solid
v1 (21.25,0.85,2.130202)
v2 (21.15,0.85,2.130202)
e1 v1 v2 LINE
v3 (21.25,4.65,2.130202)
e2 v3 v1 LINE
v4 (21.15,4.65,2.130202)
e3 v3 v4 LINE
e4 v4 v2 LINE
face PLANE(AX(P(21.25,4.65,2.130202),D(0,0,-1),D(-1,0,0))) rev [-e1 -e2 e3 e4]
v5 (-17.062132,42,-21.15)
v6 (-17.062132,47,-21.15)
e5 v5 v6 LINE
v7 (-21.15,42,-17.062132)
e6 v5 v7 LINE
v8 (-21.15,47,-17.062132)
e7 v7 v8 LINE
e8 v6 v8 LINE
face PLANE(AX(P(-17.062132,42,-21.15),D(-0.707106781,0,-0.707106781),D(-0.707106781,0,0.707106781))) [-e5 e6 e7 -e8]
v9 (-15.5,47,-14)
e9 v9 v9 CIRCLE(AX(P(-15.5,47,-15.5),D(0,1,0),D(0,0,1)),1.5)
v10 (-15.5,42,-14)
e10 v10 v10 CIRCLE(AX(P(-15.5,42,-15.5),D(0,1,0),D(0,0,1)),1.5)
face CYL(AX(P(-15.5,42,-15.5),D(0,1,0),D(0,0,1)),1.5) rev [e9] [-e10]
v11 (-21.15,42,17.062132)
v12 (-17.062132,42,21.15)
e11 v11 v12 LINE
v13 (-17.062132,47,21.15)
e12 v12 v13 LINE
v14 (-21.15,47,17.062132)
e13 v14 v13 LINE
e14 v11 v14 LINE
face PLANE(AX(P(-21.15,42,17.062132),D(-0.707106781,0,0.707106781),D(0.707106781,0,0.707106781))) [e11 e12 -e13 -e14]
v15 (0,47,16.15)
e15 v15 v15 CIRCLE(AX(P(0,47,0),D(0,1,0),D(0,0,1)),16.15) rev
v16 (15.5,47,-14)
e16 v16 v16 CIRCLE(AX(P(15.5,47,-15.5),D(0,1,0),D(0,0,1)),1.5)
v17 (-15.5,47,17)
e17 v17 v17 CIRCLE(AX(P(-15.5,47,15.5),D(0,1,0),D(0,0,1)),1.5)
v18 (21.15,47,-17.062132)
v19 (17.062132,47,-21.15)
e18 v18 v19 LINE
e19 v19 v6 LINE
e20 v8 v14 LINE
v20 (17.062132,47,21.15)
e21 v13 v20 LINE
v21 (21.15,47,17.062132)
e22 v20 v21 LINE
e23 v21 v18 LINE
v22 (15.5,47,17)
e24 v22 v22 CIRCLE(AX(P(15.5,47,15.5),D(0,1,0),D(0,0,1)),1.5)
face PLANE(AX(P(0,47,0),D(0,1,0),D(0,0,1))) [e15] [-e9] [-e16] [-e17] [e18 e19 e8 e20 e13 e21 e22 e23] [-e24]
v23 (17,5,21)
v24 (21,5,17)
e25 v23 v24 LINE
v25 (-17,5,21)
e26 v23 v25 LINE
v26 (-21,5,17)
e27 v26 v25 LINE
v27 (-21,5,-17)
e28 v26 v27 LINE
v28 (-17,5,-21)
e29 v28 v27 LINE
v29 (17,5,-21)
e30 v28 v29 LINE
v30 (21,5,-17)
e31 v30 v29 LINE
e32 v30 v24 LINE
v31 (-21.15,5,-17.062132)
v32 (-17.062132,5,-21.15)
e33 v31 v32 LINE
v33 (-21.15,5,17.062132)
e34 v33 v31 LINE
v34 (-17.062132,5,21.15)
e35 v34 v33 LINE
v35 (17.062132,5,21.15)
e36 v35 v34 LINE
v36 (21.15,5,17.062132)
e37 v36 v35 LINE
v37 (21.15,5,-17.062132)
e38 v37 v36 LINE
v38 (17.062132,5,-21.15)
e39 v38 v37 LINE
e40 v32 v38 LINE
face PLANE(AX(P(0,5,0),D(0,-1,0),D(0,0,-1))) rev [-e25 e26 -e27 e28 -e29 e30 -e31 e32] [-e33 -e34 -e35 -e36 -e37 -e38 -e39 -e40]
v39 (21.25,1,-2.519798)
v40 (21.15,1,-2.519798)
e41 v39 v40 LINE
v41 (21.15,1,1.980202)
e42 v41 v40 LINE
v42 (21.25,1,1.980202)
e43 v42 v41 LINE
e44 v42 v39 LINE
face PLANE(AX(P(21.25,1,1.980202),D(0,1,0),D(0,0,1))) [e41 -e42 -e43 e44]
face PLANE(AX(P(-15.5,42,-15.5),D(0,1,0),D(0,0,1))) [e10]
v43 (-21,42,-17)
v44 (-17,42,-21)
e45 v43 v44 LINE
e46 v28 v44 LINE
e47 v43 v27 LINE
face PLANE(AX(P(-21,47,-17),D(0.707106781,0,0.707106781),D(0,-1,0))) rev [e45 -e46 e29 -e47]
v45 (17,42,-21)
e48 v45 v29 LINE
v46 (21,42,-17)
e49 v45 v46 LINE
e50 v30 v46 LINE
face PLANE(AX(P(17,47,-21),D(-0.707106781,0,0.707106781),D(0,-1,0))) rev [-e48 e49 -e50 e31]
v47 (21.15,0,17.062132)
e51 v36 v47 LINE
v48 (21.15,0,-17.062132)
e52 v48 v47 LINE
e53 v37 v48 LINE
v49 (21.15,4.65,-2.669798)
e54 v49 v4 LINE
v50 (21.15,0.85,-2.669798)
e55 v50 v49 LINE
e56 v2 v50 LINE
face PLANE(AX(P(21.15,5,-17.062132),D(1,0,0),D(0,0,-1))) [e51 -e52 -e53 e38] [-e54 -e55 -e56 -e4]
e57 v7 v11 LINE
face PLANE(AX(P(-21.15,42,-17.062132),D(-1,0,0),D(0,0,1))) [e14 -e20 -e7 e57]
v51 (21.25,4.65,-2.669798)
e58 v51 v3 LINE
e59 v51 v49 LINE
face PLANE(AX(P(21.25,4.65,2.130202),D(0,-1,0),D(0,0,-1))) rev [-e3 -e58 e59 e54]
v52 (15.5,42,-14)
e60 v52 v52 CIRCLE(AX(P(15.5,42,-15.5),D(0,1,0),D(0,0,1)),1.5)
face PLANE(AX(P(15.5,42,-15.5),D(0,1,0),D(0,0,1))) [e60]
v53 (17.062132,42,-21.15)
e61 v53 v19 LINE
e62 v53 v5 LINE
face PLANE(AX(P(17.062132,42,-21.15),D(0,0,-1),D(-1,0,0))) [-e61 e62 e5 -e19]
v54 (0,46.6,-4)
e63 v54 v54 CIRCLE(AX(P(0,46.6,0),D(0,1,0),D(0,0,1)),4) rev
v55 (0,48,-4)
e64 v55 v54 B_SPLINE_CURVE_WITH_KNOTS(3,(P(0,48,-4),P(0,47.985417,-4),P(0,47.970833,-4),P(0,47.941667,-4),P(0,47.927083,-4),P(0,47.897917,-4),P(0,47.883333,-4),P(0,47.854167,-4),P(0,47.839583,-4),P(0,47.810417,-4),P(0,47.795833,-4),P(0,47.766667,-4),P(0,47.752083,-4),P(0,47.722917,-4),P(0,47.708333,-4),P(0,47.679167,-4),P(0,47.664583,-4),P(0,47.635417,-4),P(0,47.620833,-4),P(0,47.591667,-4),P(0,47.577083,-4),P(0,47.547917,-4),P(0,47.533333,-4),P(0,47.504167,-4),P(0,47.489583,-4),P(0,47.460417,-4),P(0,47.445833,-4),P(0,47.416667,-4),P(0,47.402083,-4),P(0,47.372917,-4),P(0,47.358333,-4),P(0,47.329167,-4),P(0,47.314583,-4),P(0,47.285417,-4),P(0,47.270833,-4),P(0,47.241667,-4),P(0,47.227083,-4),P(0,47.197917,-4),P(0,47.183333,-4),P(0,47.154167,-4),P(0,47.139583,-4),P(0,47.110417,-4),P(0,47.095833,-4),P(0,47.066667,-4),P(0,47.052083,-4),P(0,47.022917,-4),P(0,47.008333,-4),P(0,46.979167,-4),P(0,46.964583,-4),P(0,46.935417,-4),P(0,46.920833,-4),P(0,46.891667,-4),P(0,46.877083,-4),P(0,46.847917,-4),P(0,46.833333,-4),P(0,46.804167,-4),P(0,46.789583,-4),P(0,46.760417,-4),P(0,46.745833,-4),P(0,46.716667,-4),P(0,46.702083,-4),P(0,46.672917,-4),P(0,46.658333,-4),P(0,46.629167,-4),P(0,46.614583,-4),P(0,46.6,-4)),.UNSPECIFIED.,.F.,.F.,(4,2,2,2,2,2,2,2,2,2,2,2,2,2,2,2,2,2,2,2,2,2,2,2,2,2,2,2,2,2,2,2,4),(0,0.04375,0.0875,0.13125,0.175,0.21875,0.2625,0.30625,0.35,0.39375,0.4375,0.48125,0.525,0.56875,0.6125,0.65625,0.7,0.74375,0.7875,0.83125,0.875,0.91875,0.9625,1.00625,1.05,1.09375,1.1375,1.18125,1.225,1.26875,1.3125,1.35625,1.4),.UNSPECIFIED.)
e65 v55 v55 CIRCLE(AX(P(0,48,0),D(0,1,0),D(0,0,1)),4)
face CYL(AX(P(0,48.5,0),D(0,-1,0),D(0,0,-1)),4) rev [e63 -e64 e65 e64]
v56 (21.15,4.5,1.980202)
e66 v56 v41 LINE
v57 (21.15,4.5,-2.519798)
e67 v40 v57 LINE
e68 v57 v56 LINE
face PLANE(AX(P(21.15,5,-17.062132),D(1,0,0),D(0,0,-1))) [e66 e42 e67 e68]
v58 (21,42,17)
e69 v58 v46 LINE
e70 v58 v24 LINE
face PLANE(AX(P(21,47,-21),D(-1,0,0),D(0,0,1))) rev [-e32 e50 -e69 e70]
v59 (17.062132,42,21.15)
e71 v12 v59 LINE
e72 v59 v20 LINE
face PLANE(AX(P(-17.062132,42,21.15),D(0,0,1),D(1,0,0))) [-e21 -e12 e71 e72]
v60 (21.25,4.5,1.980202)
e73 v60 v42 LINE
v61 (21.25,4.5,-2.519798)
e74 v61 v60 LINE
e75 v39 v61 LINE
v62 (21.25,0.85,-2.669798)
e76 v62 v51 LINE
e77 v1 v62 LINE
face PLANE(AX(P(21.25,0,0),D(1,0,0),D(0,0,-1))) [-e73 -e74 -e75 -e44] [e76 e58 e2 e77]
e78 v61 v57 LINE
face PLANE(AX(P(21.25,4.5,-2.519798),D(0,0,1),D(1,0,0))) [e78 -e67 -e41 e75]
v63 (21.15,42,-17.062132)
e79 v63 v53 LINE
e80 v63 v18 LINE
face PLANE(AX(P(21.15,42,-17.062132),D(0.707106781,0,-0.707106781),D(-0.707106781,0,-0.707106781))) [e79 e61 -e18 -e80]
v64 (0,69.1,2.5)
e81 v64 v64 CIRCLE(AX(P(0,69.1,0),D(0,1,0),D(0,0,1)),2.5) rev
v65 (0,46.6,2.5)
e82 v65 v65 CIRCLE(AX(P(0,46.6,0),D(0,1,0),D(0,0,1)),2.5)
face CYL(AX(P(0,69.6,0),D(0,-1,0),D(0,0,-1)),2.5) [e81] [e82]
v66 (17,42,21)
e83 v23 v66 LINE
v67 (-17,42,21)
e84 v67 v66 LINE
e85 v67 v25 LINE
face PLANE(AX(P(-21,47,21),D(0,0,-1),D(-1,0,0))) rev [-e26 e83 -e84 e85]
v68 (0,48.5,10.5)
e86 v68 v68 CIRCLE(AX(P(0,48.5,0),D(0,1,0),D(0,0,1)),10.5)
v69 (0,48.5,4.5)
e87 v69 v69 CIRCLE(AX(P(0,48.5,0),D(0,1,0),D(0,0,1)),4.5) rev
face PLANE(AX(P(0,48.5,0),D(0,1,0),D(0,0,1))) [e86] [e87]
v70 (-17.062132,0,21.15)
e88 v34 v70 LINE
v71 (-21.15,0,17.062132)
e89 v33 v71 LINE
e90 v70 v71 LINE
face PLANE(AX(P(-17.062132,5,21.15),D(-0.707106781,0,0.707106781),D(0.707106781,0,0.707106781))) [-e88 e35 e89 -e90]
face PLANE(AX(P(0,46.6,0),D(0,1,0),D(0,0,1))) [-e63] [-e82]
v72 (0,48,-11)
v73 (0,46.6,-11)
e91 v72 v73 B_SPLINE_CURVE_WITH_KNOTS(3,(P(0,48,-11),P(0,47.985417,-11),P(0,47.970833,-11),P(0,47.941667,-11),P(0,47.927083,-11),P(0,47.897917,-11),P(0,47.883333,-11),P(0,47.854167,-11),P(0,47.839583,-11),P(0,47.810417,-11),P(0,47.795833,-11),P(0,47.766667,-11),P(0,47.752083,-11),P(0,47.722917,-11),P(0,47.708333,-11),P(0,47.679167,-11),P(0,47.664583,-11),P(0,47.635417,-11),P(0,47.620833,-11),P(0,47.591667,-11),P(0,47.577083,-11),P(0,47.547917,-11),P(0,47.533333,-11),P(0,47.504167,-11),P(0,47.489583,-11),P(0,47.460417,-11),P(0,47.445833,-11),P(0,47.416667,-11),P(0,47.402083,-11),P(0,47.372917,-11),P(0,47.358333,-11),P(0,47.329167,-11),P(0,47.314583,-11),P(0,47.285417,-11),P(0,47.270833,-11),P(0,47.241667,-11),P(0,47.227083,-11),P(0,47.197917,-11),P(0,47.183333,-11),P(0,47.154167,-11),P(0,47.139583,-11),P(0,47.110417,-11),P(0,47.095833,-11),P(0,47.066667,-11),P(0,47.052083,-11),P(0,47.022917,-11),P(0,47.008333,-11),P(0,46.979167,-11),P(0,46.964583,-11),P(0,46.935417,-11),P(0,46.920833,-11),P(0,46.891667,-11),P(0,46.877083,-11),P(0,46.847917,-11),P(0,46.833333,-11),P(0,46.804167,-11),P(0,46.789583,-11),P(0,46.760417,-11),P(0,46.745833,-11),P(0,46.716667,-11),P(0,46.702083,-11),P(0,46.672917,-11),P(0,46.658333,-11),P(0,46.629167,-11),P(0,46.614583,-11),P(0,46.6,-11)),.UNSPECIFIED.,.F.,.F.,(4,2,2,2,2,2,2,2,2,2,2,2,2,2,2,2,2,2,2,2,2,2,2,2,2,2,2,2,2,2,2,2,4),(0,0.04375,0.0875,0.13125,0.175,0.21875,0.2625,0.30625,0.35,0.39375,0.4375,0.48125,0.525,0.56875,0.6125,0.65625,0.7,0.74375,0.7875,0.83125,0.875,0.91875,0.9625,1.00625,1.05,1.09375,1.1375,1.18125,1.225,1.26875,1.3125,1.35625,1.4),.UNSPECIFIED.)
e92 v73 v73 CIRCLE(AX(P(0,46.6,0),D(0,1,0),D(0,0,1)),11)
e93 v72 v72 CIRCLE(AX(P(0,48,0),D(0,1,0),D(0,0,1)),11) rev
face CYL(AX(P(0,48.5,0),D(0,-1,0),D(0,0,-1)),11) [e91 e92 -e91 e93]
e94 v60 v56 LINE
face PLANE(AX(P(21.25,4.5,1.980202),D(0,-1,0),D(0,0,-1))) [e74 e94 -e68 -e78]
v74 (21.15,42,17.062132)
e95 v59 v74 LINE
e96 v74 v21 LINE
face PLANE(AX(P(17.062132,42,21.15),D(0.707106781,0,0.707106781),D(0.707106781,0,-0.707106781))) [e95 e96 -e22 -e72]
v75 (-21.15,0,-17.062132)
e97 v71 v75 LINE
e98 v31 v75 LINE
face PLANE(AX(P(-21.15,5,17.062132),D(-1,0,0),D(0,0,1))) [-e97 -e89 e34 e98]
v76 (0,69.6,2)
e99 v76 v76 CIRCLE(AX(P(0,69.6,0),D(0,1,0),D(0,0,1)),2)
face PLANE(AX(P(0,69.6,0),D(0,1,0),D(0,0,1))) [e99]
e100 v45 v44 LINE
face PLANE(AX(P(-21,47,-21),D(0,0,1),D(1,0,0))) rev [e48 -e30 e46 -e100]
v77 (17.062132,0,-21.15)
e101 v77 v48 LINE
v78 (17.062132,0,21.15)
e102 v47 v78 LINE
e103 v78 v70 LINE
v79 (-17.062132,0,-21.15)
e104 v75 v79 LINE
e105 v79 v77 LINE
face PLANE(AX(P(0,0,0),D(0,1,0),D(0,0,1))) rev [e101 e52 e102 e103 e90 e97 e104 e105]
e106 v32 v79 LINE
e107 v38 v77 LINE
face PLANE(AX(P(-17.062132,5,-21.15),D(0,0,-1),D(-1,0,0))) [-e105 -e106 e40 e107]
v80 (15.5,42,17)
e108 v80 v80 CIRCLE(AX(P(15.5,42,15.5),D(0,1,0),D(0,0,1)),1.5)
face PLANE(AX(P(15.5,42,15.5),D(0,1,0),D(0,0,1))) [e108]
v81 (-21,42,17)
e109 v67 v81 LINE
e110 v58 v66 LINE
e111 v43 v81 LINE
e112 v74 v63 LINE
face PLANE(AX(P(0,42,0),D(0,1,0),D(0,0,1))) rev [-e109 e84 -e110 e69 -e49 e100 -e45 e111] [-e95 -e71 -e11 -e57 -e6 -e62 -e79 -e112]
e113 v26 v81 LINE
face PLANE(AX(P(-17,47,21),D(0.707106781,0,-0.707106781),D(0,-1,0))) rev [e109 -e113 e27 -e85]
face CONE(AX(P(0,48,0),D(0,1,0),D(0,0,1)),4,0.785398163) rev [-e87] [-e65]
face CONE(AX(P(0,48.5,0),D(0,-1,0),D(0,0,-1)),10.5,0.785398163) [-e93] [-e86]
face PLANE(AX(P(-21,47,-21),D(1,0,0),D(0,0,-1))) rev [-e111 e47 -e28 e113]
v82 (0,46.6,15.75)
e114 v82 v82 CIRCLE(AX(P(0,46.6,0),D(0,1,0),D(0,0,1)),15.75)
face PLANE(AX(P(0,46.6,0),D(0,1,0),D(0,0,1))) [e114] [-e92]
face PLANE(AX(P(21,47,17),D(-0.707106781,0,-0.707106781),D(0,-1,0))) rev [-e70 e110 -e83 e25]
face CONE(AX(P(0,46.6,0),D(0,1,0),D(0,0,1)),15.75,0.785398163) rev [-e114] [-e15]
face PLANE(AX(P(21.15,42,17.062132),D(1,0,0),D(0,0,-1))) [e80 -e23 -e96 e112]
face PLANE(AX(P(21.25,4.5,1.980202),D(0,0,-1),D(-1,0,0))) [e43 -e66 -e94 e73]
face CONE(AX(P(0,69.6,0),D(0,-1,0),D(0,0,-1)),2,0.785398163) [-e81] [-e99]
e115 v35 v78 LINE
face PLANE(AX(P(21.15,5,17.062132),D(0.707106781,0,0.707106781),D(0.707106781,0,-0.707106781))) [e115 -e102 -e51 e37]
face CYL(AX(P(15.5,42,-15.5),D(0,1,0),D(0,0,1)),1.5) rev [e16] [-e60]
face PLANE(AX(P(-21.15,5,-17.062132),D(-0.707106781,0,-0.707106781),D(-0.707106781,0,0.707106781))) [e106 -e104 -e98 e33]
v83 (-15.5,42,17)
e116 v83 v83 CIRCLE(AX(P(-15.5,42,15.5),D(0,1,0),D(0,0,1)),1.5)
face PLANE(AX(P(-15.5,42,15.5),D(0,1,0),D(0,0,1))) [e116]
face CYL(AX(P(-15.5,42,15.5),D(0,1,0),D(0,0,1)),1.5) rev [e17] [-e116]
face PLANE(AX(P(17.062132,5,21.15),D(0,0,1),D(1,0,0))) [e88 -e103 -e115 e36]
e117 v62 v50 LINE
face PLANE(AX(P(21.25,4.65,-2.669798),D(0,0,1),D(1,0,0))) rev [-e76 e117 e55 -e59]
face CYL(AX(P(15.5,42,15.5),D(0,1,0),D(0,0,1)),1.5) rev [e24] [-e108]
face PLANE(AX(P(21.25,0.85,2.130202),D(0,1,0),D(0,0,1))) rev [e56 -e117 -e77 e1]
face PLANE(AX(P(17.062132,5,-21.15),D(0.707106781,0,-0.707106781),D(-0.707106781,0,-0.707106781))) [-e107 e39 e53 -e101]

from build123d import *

# Parameters (mm, degrees)
SKETCH1_W           = 42
SKETCH1_H           = 42
BOSS_EXTRUDE1_DEPTH = 47
CHAMFER1_SIZE       = 4
BOSS_EXTRUDE4_DEPTH = 5
BOSS_EXTRUDE5_DEPTH = 5
SKETCH2_R           = 16.25
CUT_EXTRUDE1_DEPTH  = 0.4
SKETCH3_R           = 11
SKETCH3_R_2         = 4
BOSS_EXTRUDE2_DEPTH = 1.9
SKETCH4_R           = 2.5
BOSS_EXTRUDE3_DEPTH = 23
CHAMFER2_SIZE       = 0.5
SKETCH5_R           = 1.5
CUT_EXTRUDE2_DEPTH  = 5
SKETCH8_W           = 4.8
SKETCH8_H           = 3.8
SKETCH8_W_2         = 4.5
SKETCH8_H_2         = 3.5
BOSS_EXTRUDE6_DEPTH = 0.1


with BuildPart() as part:
    # Sketch1 → Boss-Extrude1 (new body)
    with BuildSketch(Plane(origin=(0, 0, 0), x_dir=(1, 0, 0), z_dir=(0, 1, 0))):
        Rectangle(SKETCH1_W, SKETCH1_H)
    extrude(amount=BOSS_EXTRUDE1_DEPTH)

    # Chamfer1
    chamfer1_edges = [part.edges().sort_by_distance(p)[0] for p in [
        (21, 23.5, 21),
        (-21, 23.5, 21),
        (-21, 23.5, -21),
        (21, 23.5, -21),
    ]]
    chamfer(chamfer1_edges, length=CHAMFER1_SIZE)

    # Sketch6 → Boss-Extrude4 (add)
    with BuildSketch(Plane(origin=(0, 47, 0), x_dir=(1, 0, 0), z_dir=(0, 1, 0))):
        Polygon((17.062132034, 21.15), (-17.062132034, 21.15), (-21.15, 17.062132034), (-21.15, -17.062132034), (-17.062132034, -21.15), (17.062132034, -21.15), (21.15, -17.062132034), (21.15, 17.062132034), align=None)
    extrude(amount=-BOSS_EXTRUDE4_DEPTH)

    # Sketch7 → Boss-Extrude5 (add)
    with BuildSketch(Plane.XZ):
        Polygon((-21.15, 17.062132034), (-21.15, -17.062132034), (-17.062132034, -21.15), (17.062132034, -21.15), (21.15, -17.062132034), (21.15, 17.062132034), (17.062132034, 21.15), (-17.062132034, 21.15), align=None)
    extrude(amount=-BOSS_EXTRUDE5_DEPTH)

    # Sketch2 → Cut-Extrude1 (cut)
    with BuildSketch(Plane(origin=(0, 47, 0), x_dir=(1, 0, 0), z_dir=(0, 1, 0))):
        with Locations(Location((0, 0, 0), (0, 0, 270))):
            Circle(SKETCH2_R)
    extrude(amount=-CUT_EXTRUDE1_DEPTH, mode=Mode.SUBTRACT)

    # Sketch3 → Boss-Extrude2 (add)
    with BuildSketch(Plane(origin=(0, 46.6, 0), x_dir=(1, 0, 0), z_dir=(0, 1, 0))):
        with Locations(Location((0, 0, 0), (0, 0, 90))):
            Circle(SKETCH3_R)
        with Locations(Location((0, 0, 0), (0, 0, 90))):
            Circle(SKETCH3_R_2, mode=Mode.SUBTRACT)
    extrude(amount=BOSS_EXTRUDE2_DEPTH)

    # Sketch4 → Boss-Extrude3 (add)
    with BuildSketch(Plane(origin=(0, 46.6, 0), x_dir=(1, 0, 0), z_dir=(0, 1, 0))):
        with Locations(Location((0, 0, 0), (0, 0, 270))):
            Circle(SKETCH4_R)
    extrude(amount=BOSS_EXTRUDE3_DEPTH)

    # Chamfer2
    # the kernel refuses this chamfer: 0.5 mm, written as the material it adds along each edge
    with BuildSketch(Plane(origin=(0, 46.6, 0), x_dir=(0, 0, 1), z_dir=(-1, 0, 0))) as chamfer2_piece_1_section:
        Polygon((16.25, CHAMFER2_SIZE), (16.25 - CHAMFER2_SIZE, 0), (16.25, 0), align=None)
    chamfer2_piece_1 = revolve(axis=Axis((0, 46.6, 0), (0, 1, 0)), mode=Mode.PRIVATE)
    chamfer2_piece_1 = split(chamfer2_piece_1, bisect_by=Plane(origin=(0, 47, -15.959627936), z_dir=(0, -1, 0)), keep=Keep.TOP, mode=Mode.PRIVATE)
    add(chamfer2_piece_1)
    # the kernel refuses this chamfer: 0.5 mm, written as the material it takes off along each edge
    with BuildSketch(Plane(origin=(0, 48.5, 0), x_dir=(0, 0, -1), z_dir=(1, 0, 0))) as chamfer2_2_piece_1:
        Polygon((4 + CHAMFER2_SIZE, 0), (4, -CHAMFER2_SIZE), (4, 0), align=None)
    revolve(axis=Axis((0, 48.5, 0), (0, 1, 0)), mode=Mode.SUBTRACT)
    with BuildSketch(Plane(origin=(0, 48.5, 0), x_dir=(0, 0, -1), z_dir=(1, 0, 0))) as chamfer2_2_piece_2:
        Polygon((11, -CHAMFER2_SIZE), (11 - CHAMFER2_SIZE, 0), (11, 0), align=None)
    revolve(axis=Axis((0, 48.5, 0), (0, 1, 0)), mode=Mode.SUBTRACT)
    with BuildSketch(Plane(origin=(0, 69.6, 0), x_dir=(0, 0, 1), z_dir=(-1, 0, 0))) as chamfer2_2_piece_3:
        Polygon((2.5, -CHAMFER2_SIZE), (2.5 - CHAMFER2_SIZE, 0), (2.5, 0), align=None)
    revolve(axis=Axis((0, 69.6, 0), (0, 1, 0)), mode=Mode.SUBTRACT)

    # Sketch5 → Cut-Extrude2 (cut)
    with BuildSketch(Plane(origin=(0, 47, 0), x_dir=(1, 0, 0), z_dir=(0, 1, 0))):
        with Locations(Location((-15.5, 15.5, 0), (0, 0, 270))):
            Circle(SKETCH5_R)
        with Locations(Location((15.5, 15.5, 0), (0, 0, 270))):
            Circle(SKETCH5_R)
        with Locations(Location((15.5, -15.5, 0), (0, 0, 270))):
            Circle(SKETCH5_R)
        with Locations(Location((-15.5, -15.5, 0), (0, 0, 270))):
            Circle(SKETCH5_R)
    extrude(amount=-CUT_EXTRUDE2_DEPTH, mode=Mode.SUBTRACT)

    # Sketch8 → Boss-Extrude6 (add)
    with BuildSketch(Plane(origin=(21.15, 0, 0), x_dir=(0, 0, -1), z_dir=(1, 0, 0))):
        with Locations((0.269797982, 2.75)):
            Rectangle(SKETCH8_W, SKETCH8_H)
        with Locations((0.269797982, 2.75)):
            Rectangle(SKETCH8_W_2, SKETCH8_H_2, mode=Mode.SUBTRACT)
    extrude(amount=BOSS_EXTRUDE6_DEPTH)


solid = part.part
